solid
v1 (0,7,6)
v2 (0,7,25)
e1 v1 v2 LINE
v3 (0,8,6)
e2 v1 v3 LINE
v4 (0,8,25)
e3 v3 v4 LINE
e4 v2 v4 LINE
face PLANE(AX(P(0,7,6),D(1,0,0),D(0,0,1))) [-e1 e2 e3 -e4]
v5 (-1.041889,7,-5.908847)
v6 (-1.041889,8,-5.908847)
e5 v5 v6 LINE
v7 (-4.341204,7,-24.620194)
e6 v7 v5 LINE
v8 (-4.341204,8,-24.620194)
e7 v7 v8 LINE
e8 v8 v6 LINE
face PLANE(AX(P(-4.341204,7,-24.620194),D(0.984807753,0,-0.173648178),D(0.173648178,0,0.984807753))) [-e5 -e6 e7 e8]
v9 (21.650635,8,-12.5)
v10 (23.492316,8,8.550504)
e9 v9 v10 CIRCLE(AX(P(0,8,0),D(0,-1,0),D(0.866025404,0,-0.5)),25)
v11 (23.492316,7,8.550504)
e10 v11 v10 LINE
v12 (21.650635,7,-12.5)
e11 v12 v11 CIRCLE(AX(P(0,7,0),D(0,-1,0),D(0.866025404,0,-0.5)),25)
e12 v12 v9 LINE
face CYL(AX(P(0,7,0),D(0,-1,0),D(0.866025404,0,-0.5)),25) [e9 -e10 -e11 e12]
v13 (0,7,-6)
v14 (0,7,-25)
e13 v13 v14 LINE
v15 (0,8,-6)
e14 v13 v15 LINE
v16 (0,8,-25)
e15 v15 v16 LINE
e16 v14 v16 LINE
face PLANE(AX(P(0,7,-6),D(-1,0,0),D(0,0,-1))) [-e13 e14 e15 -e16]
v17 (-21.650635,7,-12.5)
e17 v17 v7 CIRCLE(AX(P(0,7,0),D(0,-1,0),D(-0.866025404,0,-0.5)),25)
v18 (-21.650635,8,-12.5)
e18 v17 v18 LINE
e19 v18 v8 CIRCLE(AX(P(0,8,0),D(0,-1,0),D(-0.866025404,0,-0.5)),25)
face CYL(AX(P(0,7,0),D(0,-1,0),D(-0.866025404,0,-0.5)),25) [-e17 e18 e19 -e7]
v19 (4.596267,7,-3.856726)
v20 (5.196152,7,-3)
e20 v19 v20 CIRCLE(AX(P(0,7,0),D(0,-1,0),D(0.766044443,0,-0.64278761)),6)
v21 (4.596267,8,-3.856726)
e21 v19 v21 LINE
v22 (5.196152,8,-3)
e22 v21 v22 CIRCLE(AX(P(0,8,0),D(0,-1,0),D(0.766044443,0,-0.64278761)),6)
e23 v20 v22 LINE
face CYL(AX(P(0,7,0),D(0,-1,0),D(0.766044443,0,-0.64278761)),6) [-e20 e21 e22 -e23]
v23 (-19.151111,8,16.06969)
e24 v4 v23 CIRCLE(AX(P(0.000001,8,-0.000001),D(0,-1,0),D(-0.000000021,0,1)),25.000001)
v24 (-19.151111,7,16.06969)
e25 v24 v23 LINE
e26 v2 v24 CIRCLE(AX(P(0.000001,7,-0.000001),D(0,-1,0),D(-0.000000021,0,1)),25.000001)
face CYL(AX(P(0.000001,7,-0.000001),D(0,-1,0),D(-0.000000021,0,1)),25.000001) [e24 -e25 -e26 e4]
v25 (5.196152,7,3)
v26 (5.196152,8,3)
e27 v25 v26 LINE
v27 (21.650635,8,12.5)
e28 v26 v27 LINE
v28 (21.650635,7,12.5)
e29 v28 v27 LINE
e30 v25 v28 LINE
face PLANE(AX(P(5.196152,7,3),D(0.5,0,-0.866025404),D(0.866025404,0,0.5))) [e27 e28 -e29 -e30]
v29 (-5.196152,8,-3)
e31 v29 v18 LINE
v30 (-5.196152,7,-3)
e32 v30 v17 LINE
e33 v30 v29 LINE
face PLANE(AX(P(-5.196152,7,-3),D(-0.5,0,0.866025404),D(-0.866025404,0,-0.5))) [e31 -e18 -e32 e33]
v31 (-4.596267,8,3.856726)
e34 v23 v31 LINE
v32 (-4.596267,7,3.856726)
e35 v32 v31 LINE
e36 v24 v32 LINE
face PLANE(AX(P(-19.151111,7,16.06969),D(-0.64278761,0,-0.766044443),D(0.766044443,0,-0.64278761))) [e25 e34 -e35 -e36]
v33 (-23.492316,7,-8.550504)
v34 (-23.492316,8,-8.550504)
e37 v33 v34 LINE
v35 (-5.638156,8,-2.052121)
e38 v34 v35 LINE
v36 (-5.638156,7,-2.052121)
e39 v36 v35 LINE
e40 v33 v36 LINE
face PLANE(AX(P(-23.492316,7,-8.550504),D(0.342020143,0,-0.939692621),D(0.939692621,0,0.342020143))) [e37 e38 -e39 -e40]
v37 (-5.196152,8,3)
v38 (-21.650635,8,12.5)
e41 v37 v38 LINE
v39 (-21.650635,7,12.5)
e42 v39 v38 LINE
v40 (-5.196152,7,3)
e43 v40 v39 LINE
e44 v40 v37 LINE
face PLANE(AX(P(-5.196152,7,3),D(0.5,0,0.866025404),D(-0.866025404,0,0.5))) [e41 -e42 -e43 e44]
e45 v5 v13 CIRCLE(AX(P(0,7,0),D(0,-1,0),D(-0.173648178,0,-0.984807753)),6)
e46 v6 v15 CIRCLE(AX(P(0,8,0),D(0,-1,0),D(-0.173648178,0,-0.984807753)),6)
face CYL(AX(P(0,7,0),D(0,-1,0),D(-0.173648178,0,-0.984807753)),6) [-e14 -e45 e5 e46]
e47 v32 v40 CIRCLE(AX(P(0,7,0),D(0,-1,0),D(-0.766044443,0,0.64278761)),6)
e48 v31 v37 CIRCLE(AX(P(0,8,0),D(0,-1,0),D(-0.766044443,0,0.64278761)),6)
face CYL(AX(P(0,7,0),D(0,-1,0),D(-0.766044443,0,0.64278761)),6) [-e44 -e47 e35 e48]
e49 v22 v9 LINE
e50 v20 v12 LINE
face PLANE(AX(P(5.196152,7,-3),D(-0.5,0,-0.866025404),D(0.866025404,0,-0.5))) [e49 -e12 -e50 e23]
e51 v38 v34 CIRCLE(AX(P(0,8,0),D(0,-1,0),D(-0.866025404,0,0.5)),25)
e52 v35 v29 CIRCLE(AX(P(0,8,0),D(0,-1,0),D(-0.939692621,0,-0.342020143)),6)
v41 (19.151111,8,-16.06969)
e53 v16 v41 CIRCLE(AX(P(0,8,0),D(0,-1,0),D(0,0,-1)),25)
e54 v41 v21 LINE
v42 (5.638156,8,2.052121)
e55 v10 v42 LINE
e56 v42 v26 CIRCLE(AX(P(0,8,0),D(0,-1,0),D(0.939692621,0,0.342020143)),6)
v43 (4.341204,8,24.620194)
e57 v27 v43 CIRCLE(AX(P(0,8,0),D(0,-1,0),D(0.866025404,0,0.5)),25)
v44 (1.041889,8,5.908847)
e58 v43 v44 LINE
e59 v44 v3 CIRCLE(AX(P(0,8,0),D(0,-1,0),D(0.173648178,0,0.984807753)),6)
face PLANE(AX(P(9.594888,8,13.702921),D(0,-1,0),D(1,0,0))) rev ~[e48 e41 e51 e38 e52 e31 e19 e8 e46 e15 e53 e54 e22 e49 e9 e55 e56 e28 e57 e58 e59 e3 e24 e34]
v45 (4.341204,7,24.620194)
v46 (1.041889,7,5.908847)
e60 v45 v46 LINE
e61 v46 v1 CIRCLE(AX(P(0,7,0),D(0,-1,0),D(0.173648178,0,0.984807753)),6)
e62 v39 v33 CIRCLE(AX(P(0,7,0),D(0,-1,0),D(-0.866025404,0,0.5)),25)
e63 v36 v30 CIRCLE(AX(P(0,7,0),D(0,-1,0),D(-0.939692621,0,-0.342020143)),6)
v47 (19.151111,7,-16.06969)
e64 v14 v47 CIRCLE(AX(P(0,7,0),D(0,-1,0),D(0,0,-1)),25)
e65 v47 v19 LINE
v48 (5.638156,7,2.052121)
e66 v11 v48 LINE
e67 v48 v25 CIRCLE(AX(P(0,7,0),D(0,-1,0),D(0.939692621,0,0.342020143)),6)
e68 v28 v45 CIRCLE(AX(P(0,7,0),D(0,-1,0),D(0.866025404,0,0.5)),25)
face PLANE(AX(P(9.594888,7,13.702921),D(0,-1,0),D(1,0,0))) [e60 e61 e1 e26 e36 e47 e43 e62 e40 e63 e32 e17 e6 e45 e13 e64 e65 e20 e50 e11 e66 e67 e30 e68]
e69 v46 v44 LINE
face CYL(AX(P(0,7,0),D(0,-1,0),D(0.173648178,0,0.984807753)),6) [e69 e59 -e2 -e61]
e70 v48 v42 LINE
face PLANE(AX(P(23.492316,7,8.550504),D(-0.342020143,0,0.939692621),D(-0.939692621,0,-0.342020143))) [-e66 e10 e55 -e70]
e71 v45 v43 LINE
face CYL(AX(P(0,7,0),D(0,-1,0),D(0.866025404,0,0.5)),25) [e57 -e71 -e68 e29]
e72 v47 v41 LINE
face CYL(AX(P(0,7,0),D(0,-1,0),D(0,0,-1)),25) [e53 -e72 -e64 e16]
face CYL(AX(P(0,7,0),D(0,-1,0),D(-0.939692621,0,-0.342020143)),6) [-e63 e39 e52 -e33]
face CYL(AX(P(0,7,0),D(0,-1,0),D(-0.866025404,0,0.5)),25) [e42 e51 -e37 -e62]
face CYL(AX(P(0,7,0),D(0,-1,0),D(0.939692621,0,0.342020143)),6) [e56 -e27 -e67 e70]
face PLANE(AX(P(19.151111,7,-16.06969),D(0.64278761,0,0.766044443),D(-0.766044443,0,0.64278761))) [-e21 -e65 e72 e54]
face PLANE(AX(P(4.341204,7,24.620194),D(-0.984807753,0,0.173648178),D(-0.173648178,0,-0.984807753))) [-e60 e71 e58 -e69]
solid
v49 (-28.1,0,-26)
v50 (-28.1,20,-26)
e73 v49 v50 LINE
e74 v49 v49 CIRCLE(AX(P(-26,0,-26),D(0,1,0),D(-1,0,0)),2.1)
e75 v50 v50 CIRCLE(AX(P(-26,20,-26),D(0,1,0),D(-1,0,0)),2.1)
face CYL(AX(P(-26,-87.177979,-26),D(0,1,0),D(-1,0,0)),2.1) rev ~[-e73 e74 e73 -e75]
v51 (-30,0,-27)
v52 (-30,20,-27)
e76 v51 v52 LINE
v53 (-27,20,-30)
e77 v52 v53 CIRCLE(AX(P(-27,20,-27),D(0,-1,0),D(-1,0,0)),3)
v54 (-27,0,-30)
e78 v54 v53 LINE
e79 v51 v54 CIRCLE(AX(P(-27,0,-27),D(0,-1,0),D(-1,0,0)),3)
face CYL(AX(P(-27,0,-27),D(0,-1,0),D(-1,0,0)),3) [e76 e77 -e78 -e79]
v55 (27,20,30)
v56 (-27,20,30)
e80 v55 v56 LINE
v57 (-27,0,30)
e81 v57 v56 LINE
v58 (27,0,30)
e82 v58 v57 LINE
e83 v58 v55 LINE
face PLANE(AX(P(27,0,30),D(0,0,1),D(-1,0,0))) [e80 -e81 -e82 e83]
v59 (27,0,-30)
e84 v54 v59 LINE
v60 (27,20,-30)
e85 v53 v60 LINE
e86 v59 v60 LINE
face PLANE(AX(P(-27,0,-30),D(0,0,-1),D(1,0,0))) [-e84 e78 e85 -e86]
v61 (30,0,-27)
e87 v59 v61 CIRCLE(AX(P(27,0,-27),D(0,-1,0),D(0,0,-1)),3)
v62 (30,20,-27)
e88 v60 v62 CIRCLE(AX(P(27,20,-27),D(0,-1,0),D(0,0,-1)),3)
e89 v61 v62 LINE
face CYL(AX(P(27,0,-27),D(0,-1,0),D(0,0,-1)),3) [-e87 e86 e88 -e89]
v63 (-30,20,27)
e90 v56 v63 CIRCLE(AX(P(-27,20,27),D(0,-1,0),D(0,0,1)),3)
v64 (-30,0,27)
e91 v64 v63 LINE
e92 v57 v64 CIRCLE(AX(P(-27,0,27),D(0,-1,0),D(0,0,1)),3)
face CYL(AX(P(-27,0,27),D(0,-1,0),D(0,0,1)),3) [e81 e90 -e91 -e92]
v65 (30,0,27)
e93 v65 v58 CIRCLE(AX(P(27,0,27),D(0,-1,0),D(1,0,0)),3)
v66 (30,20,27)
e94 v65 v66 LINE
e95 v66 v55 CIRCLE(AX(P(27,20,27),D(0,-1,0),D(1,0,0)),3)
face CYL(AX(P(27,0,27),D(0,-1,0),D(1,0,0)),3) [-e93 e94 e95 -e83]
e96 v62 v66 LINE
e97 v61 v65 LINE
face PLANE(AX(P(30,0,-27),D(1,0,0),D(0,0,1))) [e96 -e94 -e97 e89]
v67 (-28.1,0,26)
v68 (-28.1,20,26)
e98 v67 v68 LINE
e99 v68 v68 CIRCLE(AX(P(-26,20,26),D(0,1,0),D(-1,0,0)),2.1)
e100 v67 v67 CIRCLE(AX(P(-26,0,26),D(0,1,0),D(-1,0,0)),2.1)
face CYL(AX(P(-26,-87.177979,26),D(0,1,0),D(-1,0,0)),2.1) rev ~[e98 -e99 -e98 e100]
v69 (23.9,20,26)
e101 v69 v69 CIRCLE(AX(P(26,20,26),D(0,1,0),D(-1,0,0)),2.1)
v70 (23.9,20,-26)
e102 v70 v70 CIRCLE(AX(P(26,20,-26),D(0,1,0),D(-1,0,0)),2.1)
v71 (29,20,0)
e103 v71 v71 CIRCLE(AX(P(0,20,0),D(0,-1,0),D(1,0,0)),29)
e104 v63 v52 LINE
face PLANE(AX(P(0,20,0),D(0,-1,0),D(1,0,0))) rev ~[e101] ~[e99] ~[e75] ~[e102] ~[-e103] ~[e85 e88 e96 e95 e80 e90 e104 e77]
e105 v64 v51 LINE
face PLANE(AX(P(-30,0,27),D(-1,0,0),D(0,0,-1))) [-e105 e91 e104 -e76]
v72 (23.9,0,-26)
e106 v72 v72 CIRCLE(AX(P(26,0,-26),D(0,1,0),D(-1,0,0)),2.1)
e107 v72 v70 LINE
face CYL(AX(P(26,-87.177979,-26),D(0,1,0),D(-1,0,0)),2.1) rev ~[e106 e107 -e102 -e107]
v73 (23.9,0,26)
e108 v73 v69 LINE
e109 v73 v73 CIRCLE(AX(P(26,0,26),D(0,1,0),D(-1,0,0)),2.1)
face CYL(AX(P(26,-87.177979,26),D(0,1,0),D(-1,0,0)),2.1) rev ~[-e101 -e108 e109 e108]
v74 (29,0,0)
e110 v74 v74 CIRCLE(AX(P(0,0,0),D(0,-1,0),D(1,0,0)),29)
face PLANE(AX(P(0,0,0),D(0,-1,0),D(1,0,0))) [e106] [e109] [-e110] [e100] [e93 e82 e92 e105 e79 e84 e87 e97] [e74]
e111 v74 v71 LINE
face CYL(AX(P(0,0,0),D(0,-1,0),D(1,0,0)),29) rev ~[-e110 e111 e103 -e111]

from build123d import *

# Parameters (mm, degrees)
F1_START = -7
F1_DEPTH = 1
F0_R     = 29
F2_DEPTH = 20
F3_D     = 4.2


# Not quite as in the source:
# - a feature names something its author has since deleted; it is built from what else it names


with BuildPart() as f1:
    # F0 (on Front) → F1 (new body)
    with BuildSketch(Plane.XZ.offset(F1_START)):
        with BuildLine():
            Line((4.3412044417, 24.6201938253), (1.041889066, 5.9088465181))
            ThreePointArc((1.041889066, 5.9088465181), (3.4414586181, 4.9149122657), (5.1961524227, 3))
            Line((5.1961524227, 3), (21.6506350946, 12.5))
            ThreePointArc((21.6506350946, 12.5), (14.3394109088, 20.4788011072), (4.3412044417, 24.6201938253))
        make_face()
        with BuildLine():
            ThreePointArc((1.041889066, 5.9088465181), (0.5229344565, 5.9771681886), (0, 6))
            ThreePointArc((0, 6), (-2.5357095704, 5.4378467222), (-4.5962666587, 3.8567256581))
            ThreePointArc((-4.5962666587, 3.8567256581), (-4.9149122657, 3.4414586181), (-5.1961524227, 3))
            ThreePointArc((-5.1961524227, 3), (-5.9771681886, 0.5229344565), (-5.6381557247, -2.05212086))
            ThreePointArc((-5.6381557247, -2.05212086), (-5.4378467222, -2.5357095704), (-5.1961524227, -3))
            ThreePointArc((-5.1961524227, -3), (-3.4414586181, -4.9149122657), (-1.041889066, -5.9088465181))
            ThreePointArc((-1.041889066, -5.9088465181), (-0.5229344565, -5.9771681886), (0, -6))
            ThreePointArc((0, -6), (2.5357095704, -5.4378467222), (4.5962666587, -3.8567256581))
            ThreePointArc((4.5962666587, -3.8567256581), (4.9149122657, -3.4414586181), (5.1961524227, -3))
            ThreePointArc((5.1961524227, -3), (5.7955549577, -1.5529142706), (6, 0))
            ThreePointArc((6, 0), (5.9088465181, 1.041889066), (5.6381557247, 2.05212086))
            ThreePointArc((5.6381557247, 2.05212086), (5.4378467222, 2.5357095704), (5.1961524227, 3))
            ThreePointArc((5.1961524227, 3), (3.4414586181, 4.9149122657), (1.041889066, 5.9088465181))
        make_face()
        with BuildLine():
            Line((0, 6), (0, 25))
            ThreePointArc((0, 25), (-10.5654564932, 22.6576945681), (-19.151111078, 16.0696902422))
            Line((-19.151111078, 16.0696902422), (-4.5962666587, 3.8567256581))
            ThreePointArc((-4.5962666587, 3.8567256581), (-2.5357095704, 5.4378467222), (0, 6))
        make_face()
        with BuildLine():
            ThreePointArc((-5.6381557247, -2.05212086), (-5.9771681886, 0.5229344565), (-5.1961524227, 3))
            Line((-5.1961524227, 3), (-21.6506350946, 12.5))
            ThreePointArc((-21.6506350946, 12.5), (-24.9048674523, 2.1788935687), (-23.4923155196, -8.5505035831))
            Line((-23.4923155196, -8.5505035831), (-5.6381557247, -2.05212086))
        make_face()
        with BuildLine():
            ThreePointArc((-1.041889066, -5.9088465181), (-3.4414586181, -4.9149122657), (-5.1961524227, -3))
            Line((-5.1961524227, -3), (-21.6506350946, -12.5))
            ThreePointArc((-21.6506350946, -12.5), (-14.3394109088, -20.4788011072), (-4.3412044417, -24.6201938253))
            Line((-4.3412044417, -24.6201938253), (-1.041889066, -5.9088465181))
        make_face()
        with BuildLine():
            ThreePointArc((4.5962666587, -3.8567256581), (2.5357095704, -5.4378467222), (0, -6))
            Line((0, -6), (0, -25))
            ThreePointArc((0, -25), (10.5654565435, -22.6576946759), (19.151111078, -16.0696902422))
            Line((19.151111078, -16.0696902422), (4.5962666587, -3.8567256581))
        make_face()
        with BuildLine():
            Line((23.4923155196, 8.5505035831), (5.6381557247, 2.05212086))
            ThreePointArc((5.6381557247, 2.05212086), (5.9088465181, 1.041889066), (6, 0))
            ThreePointArc((6, 0), (5.7955549577, -1.5529142706), (5.1961524227, -3))
            Line((5.1961524227, -3), (21.6506350946, -12.5))
            ThreePointArc((21.6506350946, -12.5), (24.9048674523, -2.1788935687), (23.4923155196, 8.5505035831))
        make_face()
    extrude(amount=-F1_DEPTH)


with BuildPart() as f2:
    # F0 (on Front) → F2 (new body)
    with BuildSketch(Plane.XZ):
        with BuildLine():
            Line((30, -27), (30, 27))
            ThreePointArc((30, 27), (29.1213203436, 29.1213203436), (27, 30))
            Line((27, 30), (-27, 30))
            ThreePointArc((-27, 30), (-29.1213203436, 29.1213203436), (-30, 27))
            Line((-30, 27), (-30, -27))
            ThreePointArc((-30, -27), (-29.1213203436, -29.1213203436), (-27, -30))
            Line((-27, -30), (27, -30))
            ThreePointArc((27, -30), (29.1213203436, -29.1213203436), (30, -27))
        make_face()
        Circle(F0_R, mode=Mode.SUBTRACT)
    extrude(amount=-F2_DEPTH)

    # F3 (through all)
    with Locations(Plane.XZ):
        with Locations((-26, 26), (26, 26), (26, -26), (-26, -26)):
            Hole(F3_D / 2)


solid = Compound([f1.part, f2.part])
